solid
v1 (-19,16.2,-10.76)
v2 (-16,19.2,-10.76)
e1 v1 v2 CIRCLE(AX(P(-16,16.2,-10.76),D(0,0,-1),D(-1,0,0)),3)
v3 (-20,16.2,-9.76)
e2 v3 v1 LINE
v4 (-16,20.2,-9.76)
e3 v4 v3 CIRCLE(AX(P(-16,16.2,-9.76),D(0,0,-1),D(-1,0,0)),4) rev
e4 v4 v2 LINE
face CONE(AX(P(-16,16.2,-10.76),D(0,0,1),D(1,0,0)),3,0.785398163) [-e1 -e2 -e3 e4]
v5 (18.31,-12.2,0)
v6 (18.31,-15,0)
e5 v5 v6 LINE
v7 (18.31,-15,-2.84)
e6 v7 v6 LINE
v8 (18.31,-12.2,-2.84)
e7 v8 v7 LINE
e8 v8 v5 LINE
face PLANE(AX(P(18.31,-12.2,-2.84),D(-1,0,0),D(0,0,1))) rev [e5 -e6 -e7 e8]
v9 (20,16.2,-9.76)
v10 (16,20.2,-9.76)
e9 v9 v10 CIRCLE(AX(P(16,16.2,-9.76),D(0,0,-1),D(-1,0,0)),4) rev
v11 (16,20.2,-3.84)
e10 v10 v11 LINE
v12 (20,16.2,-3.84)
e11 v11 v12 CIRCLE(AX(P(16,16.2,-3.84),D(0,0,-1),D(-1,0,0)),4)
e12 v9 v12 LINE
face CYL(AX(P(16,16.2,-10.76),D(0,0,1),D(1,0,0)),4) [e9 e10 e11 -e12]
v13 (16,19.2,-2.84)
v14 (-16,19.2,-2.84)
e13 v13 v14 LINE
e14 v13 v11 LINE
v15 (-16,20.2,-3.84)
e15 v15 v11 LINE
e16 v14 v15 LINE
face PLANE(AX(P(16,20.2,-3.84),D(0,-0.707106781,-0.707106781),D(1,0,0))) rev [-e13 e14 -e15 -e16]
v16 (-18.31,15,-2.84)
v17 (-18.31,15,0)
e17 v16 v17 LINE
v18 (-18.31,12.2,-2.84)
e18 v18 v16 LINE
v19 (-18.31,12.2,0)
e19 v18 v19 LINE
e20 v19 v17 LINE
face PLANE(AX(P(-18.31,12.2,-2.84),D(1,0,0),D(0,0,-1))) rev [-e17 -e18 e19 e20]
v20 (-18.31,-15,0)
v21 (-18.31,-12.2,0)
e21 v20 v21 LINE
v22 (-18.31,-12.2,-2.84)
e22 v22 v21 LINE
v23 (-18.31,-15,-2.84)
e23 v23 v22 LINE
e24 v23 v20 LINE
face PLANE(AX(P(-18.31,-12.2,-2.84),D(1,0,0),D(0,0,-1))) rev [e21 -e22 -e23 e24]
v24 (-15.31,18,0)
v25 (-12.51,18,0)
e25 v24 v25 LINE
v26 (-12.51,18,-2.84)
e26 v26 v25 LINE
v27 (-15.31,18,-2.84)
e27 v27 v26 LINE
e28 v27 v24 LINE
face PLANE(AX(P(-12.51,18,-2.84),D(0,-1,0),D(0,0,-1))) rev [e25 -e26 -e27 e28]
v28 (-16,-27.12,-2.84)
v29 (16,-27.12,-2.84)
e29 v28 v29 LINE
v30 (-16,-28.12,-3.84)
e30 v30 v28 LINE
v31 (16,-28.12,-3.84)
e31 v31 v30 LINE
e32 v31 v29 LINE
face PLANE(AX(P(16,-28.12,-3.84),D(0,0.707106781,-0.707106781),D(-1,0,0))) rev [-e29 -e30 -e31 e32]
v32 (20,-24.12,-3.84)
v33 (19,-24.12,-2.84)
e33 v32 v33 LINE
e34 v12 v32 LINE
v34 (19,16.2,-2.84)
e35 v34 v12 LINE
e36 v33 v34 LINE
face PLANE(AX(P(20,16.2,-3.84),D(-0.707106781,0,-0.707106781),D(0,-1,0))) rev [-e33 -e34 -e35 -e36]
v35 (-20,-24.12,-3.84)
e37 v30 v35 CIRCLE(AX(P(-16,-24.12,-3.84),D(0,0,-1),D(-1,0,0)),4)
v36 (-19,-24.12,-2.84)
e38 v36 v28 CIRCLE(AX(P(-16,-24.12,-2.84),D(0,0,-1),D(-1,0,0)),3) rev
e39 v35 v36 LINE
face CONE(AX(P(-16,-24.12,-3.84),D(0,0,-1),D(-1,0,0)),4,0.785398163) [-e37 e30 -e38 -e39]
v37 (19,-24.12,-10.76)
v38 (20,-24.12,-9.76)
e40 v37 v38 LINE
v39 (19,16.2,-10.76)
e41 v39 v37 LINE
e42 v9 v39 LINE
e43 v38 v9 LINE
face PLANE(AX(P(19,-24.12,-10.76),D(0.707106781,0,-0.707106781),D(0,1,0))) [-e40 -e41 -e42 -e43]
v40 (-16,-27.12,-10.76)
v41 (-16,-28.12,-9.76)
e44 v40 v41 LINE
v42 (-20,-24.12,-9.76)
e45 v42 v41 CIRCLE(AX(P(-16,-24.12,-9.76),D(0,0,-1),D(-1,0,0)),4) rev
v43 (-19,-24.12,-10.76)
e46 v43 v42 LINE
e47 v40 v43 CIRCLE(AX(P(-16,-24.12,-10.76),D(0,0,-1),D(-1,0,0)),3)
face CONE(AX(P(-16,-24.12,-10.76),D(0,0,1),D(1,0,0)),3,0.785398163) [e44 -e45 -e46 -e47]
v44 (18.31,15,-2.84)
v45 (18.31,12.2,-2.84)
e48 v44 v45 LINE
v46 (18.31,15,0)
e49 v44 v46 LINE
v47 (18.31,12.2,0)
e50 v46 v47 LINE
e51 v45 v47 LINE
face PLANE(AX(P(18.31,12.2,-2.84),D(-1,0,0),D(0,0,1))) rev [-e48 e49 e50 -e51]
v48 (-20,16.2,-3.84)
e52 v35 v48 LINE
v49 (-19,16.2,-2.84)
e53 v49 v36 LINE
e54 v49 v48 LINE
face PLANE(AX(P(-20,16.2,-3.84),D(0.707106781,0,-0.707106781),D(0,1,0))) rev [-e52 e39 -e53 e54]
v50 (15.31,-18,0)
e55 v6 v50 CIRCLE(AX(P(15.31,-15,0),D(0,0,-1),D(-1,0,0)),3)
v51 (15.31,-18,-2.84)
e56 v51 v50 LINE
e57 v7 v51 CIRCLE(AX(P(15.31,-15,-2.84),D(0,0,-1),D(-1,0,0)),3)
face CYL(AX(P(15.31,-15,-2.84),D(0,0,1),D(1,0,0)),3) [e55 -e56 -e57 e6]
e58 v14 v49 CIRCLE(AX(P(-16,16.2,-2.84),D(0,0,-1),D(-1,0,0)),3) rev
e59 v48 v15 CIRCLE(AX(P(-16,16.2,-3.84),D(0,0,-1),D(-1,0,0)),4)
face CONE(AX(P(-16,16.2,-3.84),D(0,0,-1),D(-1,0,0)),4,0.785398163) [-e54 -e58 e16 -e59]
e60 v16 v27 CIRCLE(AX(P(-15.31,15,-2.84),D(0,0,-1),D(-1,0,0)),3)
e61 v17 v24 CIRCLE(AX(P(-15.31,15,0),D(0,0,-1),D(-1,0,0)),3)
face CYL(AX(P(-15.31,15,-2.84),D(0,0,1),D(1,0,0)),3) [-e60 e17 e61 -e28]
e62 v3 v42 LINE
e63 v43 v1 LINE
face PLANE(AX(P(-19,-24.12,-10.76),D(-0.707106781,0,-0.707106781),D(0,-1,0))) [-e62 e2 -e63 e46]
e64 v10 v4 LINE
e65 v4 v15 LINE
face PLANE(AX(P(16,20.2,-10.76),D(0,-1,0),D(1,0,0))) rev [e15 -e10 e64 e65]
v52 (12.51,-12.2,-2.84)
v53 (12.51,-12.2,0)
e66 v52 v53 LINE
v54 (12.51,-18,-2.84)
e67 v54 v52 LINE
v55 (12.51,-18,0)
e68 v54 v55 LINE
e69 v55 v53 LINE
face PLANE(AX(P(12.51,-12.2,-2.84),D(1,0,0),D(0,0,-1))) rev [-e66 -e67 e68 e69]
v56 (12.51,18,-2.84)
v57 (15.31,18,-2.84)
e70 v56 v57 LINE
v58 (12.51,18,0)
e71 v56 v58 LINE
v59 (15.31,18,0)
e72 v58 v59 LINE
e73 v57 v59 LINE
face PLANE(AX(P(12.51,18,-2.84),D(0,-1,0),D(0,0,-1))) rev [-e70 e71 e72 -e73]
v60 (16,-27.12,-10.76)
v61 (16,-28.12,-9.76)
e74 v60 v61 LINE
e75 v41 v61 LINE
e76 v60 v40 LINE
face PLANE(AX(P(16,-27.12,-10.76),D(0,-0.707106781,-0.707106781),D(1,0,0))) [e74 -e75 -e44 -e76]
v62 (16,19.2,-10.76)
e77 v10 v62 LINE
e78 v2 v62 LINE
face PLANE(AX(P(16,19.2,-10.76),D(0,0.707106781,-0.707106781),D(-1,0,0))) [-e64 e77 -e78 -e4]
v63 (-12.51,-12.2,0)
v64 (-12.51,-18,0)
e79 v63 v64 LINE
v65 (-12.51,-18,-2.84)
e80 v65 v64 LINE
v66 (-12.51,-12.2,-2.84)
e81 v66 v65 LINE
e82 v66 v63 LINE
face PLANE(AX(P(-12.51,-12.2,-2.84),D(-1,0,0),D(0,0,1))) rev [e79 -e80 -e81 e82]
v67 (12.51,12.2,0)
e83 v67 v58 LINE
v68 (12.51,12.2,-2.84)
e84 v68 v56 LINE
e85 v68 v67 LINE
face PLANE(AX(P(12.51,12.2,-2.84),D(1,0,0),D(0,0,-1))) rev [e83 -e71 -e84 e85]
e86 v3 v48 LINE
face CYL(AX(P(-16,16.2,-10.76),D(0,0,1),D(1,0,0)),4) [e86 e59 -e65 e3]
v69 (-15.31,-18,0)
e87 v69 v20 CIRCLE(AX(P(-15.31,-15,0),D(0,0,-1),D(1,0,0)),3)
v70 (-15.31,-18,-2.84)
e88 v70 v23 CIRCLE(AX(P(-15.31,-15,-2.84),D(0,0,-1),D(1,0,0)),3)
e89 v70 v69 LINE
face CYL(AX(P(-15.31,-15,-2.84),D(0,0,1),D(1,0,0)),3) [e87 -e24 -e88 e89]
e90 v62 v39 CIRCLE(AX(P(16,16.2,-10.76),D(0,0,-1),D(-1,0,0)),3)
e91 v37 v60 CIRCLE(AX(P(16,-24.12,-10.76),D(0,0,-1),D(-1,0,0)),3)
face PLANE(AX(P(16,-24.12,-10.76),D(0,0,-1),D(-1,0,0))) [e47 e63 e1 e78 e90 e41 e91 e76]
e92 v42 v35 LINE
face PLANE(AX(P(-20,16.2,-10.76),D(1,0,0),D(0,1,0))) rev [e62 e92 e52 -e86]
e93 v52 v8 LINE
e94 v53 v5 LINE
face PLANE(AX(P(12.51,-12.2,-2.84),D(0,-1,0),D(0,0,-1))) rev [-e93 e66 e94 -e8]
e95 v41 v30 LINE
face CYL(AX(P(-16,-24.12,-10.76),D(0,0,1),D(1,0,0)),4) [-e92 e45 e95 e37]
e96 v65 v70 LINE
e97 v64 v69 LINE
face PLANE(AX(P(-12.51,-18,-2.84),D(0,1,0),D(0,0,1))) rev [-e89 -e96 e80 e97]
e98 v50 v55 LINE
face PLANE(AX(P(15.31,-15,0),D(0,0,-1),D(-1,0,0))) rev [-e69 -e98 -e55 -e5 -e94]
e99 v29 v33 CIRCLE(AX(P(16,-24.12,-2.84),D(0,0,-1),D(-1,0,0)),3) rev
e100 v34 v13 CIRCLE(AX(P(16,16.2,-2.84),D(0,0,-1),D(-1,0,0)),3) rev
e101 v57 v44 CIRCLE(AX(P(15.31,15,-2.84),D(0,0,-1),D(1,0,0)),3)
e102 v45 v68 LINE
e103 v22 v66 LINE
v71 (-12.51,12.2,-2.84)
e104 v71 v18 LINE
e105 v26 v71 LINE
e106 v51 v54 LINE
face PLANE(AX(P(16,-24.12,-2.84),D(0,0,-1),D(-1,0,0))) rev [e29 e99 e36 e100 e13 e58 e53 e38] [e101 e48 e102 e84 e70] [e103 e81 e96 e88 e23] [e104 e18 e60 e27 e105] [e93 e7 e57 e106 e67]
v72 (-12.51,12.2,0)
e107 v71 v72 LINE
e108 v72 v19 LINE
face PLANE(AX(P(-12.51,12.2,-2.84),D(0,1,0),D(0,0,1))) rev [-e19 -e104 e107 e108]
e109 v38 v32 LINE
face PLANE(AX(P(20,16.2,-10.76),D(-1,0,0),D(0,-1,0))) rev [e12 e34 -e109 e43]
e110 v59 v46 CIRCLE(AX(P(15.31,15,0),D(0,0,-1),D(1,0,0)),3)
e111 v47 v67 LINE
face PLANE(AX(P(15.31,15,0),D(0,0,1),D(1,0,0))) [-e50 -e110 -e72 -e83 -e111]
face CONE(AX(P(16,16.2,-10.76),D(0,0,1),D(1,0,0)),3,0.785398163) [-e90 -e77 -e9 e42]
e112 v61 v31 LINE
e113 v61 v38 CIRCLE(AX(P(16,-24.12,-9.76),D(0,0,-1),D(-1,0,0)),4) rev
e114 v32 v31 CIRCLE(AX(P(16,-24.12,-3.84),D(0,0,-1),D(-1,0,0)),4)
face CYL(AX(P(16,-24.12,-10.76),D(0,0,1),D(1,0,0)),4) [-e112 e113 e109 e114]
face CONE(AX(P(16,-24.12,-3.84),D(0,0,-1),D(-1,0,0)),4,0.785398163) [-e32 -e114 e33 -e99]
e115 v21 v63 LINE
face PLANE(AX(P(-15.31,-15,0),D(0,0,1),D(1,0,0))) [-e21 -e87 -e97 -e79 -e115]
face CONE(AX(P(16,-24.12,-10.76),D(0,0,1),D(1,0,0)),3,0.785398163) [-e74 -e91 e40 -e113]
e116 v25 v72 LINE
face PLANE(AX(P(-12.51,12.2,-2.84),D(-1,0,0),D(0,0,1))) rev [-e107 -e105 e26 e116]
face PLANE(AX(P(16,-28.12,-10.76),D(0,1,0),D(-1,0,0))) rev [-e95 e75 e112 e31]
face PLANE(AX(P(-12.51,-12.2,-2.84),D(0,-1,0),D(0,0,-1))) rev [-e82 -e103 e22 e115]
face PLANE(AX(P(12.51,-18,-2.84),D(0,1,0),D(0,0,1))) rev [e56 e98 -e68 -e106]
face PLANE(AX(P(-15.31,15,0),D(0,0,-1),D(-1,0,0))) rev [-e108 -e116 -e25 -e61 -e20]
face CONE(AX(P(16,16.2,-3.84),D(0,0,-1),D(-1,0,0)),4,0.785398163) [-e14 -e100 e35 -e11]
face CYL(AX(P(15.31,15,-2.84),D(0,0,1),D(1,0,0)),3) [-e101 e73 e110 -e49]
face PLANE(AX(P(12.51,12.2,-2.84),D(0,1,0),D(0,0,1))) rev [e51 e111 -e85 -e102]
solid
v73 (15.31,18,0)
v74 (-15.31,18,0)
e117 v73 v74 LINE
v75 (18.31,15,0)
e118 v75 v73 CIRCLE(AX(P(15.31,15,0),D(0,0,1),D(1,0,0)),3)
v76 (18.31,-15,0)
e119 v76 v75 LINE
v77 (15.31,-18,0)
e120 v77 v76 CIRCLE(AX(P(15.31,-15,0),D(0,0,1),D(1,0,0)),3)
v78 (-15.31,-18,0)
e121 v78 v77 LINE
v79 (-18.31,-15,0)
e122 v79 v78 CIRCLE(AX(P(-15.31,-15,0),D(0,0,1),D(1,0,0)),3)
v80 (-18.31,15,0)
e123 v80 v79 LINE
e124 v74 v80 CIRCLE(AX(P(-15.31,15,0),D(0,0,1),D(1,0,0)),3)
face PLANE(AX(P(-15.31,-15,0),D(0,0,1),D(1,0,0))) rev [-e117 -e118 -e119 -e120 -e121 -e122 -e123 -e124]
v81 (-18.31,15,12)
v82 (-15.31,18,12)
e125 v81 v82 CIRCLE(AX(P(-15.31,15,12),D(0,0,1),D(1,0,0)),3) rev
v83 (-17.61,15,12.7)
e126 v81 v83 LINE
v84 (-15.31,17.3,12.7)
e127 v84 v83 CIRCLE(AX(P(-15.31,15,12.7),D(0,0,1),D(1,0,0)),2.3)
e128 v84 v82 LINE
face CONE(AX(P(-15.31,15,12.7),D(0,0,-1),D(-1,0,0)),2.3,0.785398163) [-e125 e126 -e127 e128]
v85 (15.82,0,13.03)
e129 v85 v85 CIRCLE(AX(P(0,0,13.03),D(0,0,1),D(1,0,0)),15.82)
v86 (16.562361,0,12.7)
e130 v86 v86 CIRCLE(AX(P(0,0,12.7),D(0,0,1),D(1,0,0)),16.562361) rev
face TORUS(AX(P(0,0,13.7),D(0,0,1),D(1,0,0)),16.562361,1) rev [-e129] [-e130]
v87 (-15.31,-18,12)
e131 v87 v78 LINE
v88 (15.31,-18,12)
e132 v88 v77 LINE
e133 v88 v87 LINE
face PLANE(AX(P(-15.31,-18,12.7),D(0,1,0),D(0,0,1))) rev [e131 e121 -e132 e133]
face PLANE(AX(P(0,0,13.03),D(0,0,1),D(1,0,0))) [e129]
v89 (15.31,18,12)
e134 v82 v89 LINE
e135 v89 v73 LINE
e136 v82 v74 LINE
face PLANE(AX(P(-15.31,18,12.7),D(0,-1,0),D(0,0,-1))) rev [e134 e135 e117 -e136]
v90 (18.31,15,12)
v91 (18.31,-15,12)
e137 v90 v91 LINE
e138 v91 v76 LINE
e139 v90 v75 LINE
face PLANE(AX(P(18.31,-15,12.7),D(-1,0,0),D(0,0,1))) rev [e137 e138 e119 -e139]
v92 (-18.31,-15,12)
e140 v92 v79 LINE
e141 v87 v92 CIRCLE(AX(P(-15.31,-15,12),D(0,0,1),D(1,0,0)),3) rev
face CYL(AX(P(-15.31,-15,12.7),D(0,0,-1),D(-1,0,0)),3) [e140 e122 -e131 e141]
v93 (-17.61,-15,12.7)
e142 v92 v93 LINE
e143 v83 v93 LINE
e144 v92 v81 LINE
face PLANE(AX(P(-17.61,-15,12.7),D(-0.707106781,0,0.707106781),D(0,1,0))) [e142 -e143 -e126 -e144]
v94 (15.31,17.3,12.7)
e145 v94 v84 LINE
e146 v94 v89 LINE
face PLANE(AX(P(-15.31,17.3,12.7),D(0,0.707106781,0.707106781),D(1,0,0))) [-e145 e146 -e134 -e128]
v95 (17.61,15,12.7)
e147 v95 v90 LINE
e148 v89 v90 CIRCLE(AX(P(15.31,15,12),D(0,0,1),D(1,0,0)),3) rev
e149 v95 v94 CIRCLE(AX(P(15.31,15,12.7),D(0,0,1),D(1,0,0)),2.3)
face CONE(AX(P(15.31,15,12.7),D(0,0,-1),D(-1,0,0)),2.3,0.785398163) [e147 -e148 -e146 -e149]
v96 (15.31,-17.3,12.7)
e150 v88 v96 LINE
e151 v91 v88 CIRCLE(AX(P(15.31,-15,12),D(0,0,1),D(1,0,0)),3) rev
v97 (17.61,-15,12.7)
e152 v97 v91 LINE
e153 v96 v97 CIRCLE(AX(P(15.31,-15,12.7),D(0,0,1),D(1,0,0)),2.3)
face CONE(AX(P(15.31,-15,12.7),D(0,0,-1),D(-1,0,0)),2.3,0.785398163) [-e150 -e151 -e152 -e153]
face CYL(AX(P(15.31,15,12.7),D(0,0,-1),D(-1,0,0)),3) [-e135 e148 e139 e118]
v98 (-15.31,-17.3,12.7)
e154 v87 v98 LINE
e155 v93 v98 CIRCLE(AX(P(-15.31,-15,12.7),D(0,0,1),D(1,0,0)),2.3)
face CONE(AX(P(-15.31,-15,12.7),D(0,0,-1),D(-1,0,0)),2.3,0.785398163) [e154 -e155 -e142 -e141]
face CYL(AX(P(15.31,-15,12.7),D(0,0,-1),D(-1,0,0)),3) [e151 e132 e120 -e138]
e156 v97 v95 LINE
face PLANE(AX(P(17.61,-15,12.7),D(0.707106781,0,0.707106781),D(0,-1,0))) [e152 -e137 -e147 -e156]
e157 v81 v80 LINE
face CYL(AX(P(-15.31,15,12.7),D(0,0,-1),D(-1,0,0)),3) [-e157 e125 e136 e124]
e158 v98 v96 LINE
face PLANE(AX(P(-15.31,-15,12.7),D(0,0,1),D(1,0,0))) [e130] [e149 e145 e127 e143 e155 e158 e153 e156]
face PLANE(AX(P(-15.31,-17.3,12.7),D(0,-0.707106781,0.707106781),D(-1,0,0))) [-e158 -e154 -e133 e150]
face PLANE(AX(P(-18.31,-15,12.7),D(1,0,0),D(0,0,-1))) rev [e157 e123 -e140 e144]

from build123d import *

# Parameters (mm, degrees)
BOSS_EXTRUDE1_DEPTH   = 12.7
SKETCH7_R             = 15.82
BOSS_EXTRUDE5_DEPTH   = 0.33
FILLET1_R             = 1
CHAMFER1_SIZE         = 0.7
BOSS_EXTRUDE6_DEPTH   = 2.84
BOSS_EXTRUDE6_2_DEPTH = 2.84
BOSS_EXTRUDE6_3_DEPTH = 2.84
BOSS_EXTRUDE6_4_DEPTH = 2.84
BOSS_EXTRUDE7_DEPTH   = 7.92
CHAMFER2_SIZE         = 1


with BuildPart() as part:
    # Sketch2 → Boss-Extrude1 (new body)
    with BuildSketch(Plane.XY):
        with BuildLine():
            Line((-15.31, -18), (15.31, -18))
            ThreePointArc((15.31, -18), (17.431320344, -17.121320344), (18.31, -15))
            Line((18.31, -15), (18.31, 15))
            ThreePointArc((18.31, 15), (17.431320344, 17.121320344), (15.31, 18))
            Line((15.31, 18), (-15.31, 18))
            ThreePointArc((-15.31, 18), (-17.431320344, 17.121320344), (-18.31, 15))
            Line((-18.31, 15), (-18.31, -15))
            ThreePointArc((-18.31, -15), (-17.431320344, -17.121320344), (-15.31, -18))
        make_face()
    extrude(amount=BOSS_EXTRUDE1_DEPTH)

    # Sketch7 → Boss-Extrude5 (add)
    with BuildSketch(Plane.XY.offset(12.7)):
        Circle(SKETCH7_R)
    extrude(amount=BOSS_EXTRUDE5_DEPTH)

    # Fillet1
    # the kernel refuses this fillet: 1 mm, written as the material it adds along each edge
    with BuildSketch(Plane(origin=(0, 0, 12.7), x_dir=(1, 0, 0), z_dir=(0, -1, 0))) as fillet1_piece_1:
        with BuildLine():
            CenterArc((16.562361098, 1), FILLET1_R, 222.067064802, 47.932935198)
            Line((15.82, 0.33), (15.805152778, 0.3166))
            ThreePointArc((15.805152778, 0.3166), (15.8, 0.165), (15.8, 0))
            Line((15.8, 0), (15.82, -0.02))
            Line((15.82, -0.02), (16.562361098, -0.02))
            Line((16.562361098, -0.02), (16.562361098, 0))
        make_face()
    revolve(axis=Axis((0, 0, 12.7), (0, 0, 1)))

    # Chamfer1
    chamfer1_edges = [part.edges().sort_by_distance(p)[0] for p in [
        (17.431320344, -17.121320344, 12.7),
        (18.31, 0, 12.7),
        (17.431320344, 17.121320344, 12.7),
        (0, 18, 12.7),
        (-17.431320344, 17.121320344, 12.7),
        (-18.31, 0, 12.7),
        (-17.431320344, -17.121320344, 12.7),
        (0, -18, 12.7),
    ]]
    chamfer(chamfer1_edges, length=CHAMFER1_SIZE)


with BuildPart() as body_2:
    # Sketch8 → Boss-Extrude6 (new body)
    with BuildSketch(Plane(origin=(0, 0, 0), x_dir=(-1, 0, 0), z_dir=(0, 0, -1))):
        with BuildLine():
            Line((-12.51, 12.2), (-18.31, 12.2))
            Line((-18.31, 12.2), (-18.31, 15))
            ThreePointArc((-18.31, 15), (-17.431320344, 17.121320344), (-15.31, 18))
            Line((-15.31, 18), (-12.51, 18))
            Line((-12.51, 18), (-12.51, 12.2))
        make_face()
    extrude(amount=BOSS_EXTRUDE6_DEPTH)



with BuildPart() as body_3:
    # Sketch8 → Boss-Extrude6 2 (new body)
    with BuildSketch(Plane(origin=(0, 0, 0), x_dir=(-1, 0, 0), z_dir=(0, 0, -1))):
        with BuildLine():
            Line((12.51, 18), (15.31, 18))
            ThreePointArc((15.31, 18), (17.431320344, 17.121320344), (18.31, 15))
            Line((18.31, 15), (18.31, 12.2))
            Line((18.31, 12.2), (12.51, 12.2))
            Line((12.51, 12.2), (12.51, 18))
        make_face()
    extrude(amount=BOSS_EXTRUDE6_2_DEPTH)


with BuildPart() as body_4:
    # Sketch8 → Boss-Extrude6 3 (new body)
    with BuildSketch(Plane(origin=(0, 0, 0), x_dir=(-1, 0, 0), z_dir=(0, 0, -1))):
        with BuildLine():
            Line((-12.51, -18), (-15.31, -18))
            ThreePointArc((-15.31, -18), (-17.431320344, -17.121320344), (-18.31, -15))
            Line((-18.31, -15), (-18.31, -12.2))
            Line((-18.31, -12.2), (-12.51, -12.2))
            Line((-12.51, -12.2), (-12.51, -18))
        make_face()
    extrude(amount=BOSS_EXTRUDE6_3_DEPTH)


with BuildPart() as body_5:
    # Sketch8 → Boss-Extrude6 4 (new body)
    with BuildSketch(Plane(origin=(0, 0, 0), x_dir=(-1, 0, 0), z_dir=(0, 0, -1))):
        with BuildLine():
            Line((12.51, -12.2), (12.51, -18))
            Line((12.51, -18), (15.31, -18))
            ThreePointArc((15.31, -18), (17.431320344, -17.121320344), (18.31, -15))
            Line((18.31, -15), (18.31, -12.2))
            Line((18.31, -12.2), (12.51, -12.2))
        make_face()
    extrude(amount=BOSS_EXTRUDE6_4_DEPTH)


with BuildPart() as body_2_1:
    add(body_2.part)

    add(body_3.part)  # Boss-Extrude7 merges body 3

    add(body_4.part)  # Boss-Extrude7 merges body 4

    add(body_5.part)  # Boss-Extrude7 merges body 5
    # Sketch9 → Boss-Extrude7 (add)
    with BuildSketch(Plane(origin=(0, 0, -2.84), x_dir=(-1, 0, 0), z_dir=(0, 0, -1))):
        with BuildLine():
            Line((-16, 20.2), (16, 20.2))
            ThreePointArc((16, 20.2), (18.828427125, 19.028427125), (20, 16.2))
            Line((20, 16.2), (20, -24.12))
            ThreePointArc((20, -24.12), (18.828427125, -26.948427125), (16, -28.12))
            Line((16, -28.12), (-16, -28.12))
            ThreePointArc((-16, -28.12), (-18.828427125, -26.948427125), (-20, -24.12))
            Line((-20, -24.12), (-20, 16.2))
            ThreePointArc((-20, 16.2), (-18.828427125, 19.028427125), (-16, 20.2))
        make_face()
    extrude(amount=BOSS_EXTRUDE7_DEPTH)

    # Chamfer2
    chamfer2_edges = [body_2_1.edges().sort_by_distance(p)[0] for p in [
        (18.828427125, -26.948427125, -2.84),
        (0, -28.12, -2.84),
        (-18.828427125, -26.948427125, -2.84),
        (-20, -3.96, -2.84),
        (-18.828427125, 19.028427125, -2.84),
        (0, 20.2, -2.84),
        (18.828427125, 19.028427125, -2.84),
        (20, -3.96, -2.84),
        (18.828427125, -26.948427125, -10.76),
        (0, -28.12, -10.76),
        (-18.828427125, -26.948427125, -10.76),
        (-20, -3.96, -10.76),
        (-18.828427125, 19.028427125, -10.76),
        (0, 20.2, -10.76),
        (18.828427125, 19.028427125, -10.76),
        (20, -3.96, -10.76),
    ]]
    chamfer(chamfer2_edges, length=CHAMFER2_SIZE)


solid = Compound([part.part, body_2_1.part])
